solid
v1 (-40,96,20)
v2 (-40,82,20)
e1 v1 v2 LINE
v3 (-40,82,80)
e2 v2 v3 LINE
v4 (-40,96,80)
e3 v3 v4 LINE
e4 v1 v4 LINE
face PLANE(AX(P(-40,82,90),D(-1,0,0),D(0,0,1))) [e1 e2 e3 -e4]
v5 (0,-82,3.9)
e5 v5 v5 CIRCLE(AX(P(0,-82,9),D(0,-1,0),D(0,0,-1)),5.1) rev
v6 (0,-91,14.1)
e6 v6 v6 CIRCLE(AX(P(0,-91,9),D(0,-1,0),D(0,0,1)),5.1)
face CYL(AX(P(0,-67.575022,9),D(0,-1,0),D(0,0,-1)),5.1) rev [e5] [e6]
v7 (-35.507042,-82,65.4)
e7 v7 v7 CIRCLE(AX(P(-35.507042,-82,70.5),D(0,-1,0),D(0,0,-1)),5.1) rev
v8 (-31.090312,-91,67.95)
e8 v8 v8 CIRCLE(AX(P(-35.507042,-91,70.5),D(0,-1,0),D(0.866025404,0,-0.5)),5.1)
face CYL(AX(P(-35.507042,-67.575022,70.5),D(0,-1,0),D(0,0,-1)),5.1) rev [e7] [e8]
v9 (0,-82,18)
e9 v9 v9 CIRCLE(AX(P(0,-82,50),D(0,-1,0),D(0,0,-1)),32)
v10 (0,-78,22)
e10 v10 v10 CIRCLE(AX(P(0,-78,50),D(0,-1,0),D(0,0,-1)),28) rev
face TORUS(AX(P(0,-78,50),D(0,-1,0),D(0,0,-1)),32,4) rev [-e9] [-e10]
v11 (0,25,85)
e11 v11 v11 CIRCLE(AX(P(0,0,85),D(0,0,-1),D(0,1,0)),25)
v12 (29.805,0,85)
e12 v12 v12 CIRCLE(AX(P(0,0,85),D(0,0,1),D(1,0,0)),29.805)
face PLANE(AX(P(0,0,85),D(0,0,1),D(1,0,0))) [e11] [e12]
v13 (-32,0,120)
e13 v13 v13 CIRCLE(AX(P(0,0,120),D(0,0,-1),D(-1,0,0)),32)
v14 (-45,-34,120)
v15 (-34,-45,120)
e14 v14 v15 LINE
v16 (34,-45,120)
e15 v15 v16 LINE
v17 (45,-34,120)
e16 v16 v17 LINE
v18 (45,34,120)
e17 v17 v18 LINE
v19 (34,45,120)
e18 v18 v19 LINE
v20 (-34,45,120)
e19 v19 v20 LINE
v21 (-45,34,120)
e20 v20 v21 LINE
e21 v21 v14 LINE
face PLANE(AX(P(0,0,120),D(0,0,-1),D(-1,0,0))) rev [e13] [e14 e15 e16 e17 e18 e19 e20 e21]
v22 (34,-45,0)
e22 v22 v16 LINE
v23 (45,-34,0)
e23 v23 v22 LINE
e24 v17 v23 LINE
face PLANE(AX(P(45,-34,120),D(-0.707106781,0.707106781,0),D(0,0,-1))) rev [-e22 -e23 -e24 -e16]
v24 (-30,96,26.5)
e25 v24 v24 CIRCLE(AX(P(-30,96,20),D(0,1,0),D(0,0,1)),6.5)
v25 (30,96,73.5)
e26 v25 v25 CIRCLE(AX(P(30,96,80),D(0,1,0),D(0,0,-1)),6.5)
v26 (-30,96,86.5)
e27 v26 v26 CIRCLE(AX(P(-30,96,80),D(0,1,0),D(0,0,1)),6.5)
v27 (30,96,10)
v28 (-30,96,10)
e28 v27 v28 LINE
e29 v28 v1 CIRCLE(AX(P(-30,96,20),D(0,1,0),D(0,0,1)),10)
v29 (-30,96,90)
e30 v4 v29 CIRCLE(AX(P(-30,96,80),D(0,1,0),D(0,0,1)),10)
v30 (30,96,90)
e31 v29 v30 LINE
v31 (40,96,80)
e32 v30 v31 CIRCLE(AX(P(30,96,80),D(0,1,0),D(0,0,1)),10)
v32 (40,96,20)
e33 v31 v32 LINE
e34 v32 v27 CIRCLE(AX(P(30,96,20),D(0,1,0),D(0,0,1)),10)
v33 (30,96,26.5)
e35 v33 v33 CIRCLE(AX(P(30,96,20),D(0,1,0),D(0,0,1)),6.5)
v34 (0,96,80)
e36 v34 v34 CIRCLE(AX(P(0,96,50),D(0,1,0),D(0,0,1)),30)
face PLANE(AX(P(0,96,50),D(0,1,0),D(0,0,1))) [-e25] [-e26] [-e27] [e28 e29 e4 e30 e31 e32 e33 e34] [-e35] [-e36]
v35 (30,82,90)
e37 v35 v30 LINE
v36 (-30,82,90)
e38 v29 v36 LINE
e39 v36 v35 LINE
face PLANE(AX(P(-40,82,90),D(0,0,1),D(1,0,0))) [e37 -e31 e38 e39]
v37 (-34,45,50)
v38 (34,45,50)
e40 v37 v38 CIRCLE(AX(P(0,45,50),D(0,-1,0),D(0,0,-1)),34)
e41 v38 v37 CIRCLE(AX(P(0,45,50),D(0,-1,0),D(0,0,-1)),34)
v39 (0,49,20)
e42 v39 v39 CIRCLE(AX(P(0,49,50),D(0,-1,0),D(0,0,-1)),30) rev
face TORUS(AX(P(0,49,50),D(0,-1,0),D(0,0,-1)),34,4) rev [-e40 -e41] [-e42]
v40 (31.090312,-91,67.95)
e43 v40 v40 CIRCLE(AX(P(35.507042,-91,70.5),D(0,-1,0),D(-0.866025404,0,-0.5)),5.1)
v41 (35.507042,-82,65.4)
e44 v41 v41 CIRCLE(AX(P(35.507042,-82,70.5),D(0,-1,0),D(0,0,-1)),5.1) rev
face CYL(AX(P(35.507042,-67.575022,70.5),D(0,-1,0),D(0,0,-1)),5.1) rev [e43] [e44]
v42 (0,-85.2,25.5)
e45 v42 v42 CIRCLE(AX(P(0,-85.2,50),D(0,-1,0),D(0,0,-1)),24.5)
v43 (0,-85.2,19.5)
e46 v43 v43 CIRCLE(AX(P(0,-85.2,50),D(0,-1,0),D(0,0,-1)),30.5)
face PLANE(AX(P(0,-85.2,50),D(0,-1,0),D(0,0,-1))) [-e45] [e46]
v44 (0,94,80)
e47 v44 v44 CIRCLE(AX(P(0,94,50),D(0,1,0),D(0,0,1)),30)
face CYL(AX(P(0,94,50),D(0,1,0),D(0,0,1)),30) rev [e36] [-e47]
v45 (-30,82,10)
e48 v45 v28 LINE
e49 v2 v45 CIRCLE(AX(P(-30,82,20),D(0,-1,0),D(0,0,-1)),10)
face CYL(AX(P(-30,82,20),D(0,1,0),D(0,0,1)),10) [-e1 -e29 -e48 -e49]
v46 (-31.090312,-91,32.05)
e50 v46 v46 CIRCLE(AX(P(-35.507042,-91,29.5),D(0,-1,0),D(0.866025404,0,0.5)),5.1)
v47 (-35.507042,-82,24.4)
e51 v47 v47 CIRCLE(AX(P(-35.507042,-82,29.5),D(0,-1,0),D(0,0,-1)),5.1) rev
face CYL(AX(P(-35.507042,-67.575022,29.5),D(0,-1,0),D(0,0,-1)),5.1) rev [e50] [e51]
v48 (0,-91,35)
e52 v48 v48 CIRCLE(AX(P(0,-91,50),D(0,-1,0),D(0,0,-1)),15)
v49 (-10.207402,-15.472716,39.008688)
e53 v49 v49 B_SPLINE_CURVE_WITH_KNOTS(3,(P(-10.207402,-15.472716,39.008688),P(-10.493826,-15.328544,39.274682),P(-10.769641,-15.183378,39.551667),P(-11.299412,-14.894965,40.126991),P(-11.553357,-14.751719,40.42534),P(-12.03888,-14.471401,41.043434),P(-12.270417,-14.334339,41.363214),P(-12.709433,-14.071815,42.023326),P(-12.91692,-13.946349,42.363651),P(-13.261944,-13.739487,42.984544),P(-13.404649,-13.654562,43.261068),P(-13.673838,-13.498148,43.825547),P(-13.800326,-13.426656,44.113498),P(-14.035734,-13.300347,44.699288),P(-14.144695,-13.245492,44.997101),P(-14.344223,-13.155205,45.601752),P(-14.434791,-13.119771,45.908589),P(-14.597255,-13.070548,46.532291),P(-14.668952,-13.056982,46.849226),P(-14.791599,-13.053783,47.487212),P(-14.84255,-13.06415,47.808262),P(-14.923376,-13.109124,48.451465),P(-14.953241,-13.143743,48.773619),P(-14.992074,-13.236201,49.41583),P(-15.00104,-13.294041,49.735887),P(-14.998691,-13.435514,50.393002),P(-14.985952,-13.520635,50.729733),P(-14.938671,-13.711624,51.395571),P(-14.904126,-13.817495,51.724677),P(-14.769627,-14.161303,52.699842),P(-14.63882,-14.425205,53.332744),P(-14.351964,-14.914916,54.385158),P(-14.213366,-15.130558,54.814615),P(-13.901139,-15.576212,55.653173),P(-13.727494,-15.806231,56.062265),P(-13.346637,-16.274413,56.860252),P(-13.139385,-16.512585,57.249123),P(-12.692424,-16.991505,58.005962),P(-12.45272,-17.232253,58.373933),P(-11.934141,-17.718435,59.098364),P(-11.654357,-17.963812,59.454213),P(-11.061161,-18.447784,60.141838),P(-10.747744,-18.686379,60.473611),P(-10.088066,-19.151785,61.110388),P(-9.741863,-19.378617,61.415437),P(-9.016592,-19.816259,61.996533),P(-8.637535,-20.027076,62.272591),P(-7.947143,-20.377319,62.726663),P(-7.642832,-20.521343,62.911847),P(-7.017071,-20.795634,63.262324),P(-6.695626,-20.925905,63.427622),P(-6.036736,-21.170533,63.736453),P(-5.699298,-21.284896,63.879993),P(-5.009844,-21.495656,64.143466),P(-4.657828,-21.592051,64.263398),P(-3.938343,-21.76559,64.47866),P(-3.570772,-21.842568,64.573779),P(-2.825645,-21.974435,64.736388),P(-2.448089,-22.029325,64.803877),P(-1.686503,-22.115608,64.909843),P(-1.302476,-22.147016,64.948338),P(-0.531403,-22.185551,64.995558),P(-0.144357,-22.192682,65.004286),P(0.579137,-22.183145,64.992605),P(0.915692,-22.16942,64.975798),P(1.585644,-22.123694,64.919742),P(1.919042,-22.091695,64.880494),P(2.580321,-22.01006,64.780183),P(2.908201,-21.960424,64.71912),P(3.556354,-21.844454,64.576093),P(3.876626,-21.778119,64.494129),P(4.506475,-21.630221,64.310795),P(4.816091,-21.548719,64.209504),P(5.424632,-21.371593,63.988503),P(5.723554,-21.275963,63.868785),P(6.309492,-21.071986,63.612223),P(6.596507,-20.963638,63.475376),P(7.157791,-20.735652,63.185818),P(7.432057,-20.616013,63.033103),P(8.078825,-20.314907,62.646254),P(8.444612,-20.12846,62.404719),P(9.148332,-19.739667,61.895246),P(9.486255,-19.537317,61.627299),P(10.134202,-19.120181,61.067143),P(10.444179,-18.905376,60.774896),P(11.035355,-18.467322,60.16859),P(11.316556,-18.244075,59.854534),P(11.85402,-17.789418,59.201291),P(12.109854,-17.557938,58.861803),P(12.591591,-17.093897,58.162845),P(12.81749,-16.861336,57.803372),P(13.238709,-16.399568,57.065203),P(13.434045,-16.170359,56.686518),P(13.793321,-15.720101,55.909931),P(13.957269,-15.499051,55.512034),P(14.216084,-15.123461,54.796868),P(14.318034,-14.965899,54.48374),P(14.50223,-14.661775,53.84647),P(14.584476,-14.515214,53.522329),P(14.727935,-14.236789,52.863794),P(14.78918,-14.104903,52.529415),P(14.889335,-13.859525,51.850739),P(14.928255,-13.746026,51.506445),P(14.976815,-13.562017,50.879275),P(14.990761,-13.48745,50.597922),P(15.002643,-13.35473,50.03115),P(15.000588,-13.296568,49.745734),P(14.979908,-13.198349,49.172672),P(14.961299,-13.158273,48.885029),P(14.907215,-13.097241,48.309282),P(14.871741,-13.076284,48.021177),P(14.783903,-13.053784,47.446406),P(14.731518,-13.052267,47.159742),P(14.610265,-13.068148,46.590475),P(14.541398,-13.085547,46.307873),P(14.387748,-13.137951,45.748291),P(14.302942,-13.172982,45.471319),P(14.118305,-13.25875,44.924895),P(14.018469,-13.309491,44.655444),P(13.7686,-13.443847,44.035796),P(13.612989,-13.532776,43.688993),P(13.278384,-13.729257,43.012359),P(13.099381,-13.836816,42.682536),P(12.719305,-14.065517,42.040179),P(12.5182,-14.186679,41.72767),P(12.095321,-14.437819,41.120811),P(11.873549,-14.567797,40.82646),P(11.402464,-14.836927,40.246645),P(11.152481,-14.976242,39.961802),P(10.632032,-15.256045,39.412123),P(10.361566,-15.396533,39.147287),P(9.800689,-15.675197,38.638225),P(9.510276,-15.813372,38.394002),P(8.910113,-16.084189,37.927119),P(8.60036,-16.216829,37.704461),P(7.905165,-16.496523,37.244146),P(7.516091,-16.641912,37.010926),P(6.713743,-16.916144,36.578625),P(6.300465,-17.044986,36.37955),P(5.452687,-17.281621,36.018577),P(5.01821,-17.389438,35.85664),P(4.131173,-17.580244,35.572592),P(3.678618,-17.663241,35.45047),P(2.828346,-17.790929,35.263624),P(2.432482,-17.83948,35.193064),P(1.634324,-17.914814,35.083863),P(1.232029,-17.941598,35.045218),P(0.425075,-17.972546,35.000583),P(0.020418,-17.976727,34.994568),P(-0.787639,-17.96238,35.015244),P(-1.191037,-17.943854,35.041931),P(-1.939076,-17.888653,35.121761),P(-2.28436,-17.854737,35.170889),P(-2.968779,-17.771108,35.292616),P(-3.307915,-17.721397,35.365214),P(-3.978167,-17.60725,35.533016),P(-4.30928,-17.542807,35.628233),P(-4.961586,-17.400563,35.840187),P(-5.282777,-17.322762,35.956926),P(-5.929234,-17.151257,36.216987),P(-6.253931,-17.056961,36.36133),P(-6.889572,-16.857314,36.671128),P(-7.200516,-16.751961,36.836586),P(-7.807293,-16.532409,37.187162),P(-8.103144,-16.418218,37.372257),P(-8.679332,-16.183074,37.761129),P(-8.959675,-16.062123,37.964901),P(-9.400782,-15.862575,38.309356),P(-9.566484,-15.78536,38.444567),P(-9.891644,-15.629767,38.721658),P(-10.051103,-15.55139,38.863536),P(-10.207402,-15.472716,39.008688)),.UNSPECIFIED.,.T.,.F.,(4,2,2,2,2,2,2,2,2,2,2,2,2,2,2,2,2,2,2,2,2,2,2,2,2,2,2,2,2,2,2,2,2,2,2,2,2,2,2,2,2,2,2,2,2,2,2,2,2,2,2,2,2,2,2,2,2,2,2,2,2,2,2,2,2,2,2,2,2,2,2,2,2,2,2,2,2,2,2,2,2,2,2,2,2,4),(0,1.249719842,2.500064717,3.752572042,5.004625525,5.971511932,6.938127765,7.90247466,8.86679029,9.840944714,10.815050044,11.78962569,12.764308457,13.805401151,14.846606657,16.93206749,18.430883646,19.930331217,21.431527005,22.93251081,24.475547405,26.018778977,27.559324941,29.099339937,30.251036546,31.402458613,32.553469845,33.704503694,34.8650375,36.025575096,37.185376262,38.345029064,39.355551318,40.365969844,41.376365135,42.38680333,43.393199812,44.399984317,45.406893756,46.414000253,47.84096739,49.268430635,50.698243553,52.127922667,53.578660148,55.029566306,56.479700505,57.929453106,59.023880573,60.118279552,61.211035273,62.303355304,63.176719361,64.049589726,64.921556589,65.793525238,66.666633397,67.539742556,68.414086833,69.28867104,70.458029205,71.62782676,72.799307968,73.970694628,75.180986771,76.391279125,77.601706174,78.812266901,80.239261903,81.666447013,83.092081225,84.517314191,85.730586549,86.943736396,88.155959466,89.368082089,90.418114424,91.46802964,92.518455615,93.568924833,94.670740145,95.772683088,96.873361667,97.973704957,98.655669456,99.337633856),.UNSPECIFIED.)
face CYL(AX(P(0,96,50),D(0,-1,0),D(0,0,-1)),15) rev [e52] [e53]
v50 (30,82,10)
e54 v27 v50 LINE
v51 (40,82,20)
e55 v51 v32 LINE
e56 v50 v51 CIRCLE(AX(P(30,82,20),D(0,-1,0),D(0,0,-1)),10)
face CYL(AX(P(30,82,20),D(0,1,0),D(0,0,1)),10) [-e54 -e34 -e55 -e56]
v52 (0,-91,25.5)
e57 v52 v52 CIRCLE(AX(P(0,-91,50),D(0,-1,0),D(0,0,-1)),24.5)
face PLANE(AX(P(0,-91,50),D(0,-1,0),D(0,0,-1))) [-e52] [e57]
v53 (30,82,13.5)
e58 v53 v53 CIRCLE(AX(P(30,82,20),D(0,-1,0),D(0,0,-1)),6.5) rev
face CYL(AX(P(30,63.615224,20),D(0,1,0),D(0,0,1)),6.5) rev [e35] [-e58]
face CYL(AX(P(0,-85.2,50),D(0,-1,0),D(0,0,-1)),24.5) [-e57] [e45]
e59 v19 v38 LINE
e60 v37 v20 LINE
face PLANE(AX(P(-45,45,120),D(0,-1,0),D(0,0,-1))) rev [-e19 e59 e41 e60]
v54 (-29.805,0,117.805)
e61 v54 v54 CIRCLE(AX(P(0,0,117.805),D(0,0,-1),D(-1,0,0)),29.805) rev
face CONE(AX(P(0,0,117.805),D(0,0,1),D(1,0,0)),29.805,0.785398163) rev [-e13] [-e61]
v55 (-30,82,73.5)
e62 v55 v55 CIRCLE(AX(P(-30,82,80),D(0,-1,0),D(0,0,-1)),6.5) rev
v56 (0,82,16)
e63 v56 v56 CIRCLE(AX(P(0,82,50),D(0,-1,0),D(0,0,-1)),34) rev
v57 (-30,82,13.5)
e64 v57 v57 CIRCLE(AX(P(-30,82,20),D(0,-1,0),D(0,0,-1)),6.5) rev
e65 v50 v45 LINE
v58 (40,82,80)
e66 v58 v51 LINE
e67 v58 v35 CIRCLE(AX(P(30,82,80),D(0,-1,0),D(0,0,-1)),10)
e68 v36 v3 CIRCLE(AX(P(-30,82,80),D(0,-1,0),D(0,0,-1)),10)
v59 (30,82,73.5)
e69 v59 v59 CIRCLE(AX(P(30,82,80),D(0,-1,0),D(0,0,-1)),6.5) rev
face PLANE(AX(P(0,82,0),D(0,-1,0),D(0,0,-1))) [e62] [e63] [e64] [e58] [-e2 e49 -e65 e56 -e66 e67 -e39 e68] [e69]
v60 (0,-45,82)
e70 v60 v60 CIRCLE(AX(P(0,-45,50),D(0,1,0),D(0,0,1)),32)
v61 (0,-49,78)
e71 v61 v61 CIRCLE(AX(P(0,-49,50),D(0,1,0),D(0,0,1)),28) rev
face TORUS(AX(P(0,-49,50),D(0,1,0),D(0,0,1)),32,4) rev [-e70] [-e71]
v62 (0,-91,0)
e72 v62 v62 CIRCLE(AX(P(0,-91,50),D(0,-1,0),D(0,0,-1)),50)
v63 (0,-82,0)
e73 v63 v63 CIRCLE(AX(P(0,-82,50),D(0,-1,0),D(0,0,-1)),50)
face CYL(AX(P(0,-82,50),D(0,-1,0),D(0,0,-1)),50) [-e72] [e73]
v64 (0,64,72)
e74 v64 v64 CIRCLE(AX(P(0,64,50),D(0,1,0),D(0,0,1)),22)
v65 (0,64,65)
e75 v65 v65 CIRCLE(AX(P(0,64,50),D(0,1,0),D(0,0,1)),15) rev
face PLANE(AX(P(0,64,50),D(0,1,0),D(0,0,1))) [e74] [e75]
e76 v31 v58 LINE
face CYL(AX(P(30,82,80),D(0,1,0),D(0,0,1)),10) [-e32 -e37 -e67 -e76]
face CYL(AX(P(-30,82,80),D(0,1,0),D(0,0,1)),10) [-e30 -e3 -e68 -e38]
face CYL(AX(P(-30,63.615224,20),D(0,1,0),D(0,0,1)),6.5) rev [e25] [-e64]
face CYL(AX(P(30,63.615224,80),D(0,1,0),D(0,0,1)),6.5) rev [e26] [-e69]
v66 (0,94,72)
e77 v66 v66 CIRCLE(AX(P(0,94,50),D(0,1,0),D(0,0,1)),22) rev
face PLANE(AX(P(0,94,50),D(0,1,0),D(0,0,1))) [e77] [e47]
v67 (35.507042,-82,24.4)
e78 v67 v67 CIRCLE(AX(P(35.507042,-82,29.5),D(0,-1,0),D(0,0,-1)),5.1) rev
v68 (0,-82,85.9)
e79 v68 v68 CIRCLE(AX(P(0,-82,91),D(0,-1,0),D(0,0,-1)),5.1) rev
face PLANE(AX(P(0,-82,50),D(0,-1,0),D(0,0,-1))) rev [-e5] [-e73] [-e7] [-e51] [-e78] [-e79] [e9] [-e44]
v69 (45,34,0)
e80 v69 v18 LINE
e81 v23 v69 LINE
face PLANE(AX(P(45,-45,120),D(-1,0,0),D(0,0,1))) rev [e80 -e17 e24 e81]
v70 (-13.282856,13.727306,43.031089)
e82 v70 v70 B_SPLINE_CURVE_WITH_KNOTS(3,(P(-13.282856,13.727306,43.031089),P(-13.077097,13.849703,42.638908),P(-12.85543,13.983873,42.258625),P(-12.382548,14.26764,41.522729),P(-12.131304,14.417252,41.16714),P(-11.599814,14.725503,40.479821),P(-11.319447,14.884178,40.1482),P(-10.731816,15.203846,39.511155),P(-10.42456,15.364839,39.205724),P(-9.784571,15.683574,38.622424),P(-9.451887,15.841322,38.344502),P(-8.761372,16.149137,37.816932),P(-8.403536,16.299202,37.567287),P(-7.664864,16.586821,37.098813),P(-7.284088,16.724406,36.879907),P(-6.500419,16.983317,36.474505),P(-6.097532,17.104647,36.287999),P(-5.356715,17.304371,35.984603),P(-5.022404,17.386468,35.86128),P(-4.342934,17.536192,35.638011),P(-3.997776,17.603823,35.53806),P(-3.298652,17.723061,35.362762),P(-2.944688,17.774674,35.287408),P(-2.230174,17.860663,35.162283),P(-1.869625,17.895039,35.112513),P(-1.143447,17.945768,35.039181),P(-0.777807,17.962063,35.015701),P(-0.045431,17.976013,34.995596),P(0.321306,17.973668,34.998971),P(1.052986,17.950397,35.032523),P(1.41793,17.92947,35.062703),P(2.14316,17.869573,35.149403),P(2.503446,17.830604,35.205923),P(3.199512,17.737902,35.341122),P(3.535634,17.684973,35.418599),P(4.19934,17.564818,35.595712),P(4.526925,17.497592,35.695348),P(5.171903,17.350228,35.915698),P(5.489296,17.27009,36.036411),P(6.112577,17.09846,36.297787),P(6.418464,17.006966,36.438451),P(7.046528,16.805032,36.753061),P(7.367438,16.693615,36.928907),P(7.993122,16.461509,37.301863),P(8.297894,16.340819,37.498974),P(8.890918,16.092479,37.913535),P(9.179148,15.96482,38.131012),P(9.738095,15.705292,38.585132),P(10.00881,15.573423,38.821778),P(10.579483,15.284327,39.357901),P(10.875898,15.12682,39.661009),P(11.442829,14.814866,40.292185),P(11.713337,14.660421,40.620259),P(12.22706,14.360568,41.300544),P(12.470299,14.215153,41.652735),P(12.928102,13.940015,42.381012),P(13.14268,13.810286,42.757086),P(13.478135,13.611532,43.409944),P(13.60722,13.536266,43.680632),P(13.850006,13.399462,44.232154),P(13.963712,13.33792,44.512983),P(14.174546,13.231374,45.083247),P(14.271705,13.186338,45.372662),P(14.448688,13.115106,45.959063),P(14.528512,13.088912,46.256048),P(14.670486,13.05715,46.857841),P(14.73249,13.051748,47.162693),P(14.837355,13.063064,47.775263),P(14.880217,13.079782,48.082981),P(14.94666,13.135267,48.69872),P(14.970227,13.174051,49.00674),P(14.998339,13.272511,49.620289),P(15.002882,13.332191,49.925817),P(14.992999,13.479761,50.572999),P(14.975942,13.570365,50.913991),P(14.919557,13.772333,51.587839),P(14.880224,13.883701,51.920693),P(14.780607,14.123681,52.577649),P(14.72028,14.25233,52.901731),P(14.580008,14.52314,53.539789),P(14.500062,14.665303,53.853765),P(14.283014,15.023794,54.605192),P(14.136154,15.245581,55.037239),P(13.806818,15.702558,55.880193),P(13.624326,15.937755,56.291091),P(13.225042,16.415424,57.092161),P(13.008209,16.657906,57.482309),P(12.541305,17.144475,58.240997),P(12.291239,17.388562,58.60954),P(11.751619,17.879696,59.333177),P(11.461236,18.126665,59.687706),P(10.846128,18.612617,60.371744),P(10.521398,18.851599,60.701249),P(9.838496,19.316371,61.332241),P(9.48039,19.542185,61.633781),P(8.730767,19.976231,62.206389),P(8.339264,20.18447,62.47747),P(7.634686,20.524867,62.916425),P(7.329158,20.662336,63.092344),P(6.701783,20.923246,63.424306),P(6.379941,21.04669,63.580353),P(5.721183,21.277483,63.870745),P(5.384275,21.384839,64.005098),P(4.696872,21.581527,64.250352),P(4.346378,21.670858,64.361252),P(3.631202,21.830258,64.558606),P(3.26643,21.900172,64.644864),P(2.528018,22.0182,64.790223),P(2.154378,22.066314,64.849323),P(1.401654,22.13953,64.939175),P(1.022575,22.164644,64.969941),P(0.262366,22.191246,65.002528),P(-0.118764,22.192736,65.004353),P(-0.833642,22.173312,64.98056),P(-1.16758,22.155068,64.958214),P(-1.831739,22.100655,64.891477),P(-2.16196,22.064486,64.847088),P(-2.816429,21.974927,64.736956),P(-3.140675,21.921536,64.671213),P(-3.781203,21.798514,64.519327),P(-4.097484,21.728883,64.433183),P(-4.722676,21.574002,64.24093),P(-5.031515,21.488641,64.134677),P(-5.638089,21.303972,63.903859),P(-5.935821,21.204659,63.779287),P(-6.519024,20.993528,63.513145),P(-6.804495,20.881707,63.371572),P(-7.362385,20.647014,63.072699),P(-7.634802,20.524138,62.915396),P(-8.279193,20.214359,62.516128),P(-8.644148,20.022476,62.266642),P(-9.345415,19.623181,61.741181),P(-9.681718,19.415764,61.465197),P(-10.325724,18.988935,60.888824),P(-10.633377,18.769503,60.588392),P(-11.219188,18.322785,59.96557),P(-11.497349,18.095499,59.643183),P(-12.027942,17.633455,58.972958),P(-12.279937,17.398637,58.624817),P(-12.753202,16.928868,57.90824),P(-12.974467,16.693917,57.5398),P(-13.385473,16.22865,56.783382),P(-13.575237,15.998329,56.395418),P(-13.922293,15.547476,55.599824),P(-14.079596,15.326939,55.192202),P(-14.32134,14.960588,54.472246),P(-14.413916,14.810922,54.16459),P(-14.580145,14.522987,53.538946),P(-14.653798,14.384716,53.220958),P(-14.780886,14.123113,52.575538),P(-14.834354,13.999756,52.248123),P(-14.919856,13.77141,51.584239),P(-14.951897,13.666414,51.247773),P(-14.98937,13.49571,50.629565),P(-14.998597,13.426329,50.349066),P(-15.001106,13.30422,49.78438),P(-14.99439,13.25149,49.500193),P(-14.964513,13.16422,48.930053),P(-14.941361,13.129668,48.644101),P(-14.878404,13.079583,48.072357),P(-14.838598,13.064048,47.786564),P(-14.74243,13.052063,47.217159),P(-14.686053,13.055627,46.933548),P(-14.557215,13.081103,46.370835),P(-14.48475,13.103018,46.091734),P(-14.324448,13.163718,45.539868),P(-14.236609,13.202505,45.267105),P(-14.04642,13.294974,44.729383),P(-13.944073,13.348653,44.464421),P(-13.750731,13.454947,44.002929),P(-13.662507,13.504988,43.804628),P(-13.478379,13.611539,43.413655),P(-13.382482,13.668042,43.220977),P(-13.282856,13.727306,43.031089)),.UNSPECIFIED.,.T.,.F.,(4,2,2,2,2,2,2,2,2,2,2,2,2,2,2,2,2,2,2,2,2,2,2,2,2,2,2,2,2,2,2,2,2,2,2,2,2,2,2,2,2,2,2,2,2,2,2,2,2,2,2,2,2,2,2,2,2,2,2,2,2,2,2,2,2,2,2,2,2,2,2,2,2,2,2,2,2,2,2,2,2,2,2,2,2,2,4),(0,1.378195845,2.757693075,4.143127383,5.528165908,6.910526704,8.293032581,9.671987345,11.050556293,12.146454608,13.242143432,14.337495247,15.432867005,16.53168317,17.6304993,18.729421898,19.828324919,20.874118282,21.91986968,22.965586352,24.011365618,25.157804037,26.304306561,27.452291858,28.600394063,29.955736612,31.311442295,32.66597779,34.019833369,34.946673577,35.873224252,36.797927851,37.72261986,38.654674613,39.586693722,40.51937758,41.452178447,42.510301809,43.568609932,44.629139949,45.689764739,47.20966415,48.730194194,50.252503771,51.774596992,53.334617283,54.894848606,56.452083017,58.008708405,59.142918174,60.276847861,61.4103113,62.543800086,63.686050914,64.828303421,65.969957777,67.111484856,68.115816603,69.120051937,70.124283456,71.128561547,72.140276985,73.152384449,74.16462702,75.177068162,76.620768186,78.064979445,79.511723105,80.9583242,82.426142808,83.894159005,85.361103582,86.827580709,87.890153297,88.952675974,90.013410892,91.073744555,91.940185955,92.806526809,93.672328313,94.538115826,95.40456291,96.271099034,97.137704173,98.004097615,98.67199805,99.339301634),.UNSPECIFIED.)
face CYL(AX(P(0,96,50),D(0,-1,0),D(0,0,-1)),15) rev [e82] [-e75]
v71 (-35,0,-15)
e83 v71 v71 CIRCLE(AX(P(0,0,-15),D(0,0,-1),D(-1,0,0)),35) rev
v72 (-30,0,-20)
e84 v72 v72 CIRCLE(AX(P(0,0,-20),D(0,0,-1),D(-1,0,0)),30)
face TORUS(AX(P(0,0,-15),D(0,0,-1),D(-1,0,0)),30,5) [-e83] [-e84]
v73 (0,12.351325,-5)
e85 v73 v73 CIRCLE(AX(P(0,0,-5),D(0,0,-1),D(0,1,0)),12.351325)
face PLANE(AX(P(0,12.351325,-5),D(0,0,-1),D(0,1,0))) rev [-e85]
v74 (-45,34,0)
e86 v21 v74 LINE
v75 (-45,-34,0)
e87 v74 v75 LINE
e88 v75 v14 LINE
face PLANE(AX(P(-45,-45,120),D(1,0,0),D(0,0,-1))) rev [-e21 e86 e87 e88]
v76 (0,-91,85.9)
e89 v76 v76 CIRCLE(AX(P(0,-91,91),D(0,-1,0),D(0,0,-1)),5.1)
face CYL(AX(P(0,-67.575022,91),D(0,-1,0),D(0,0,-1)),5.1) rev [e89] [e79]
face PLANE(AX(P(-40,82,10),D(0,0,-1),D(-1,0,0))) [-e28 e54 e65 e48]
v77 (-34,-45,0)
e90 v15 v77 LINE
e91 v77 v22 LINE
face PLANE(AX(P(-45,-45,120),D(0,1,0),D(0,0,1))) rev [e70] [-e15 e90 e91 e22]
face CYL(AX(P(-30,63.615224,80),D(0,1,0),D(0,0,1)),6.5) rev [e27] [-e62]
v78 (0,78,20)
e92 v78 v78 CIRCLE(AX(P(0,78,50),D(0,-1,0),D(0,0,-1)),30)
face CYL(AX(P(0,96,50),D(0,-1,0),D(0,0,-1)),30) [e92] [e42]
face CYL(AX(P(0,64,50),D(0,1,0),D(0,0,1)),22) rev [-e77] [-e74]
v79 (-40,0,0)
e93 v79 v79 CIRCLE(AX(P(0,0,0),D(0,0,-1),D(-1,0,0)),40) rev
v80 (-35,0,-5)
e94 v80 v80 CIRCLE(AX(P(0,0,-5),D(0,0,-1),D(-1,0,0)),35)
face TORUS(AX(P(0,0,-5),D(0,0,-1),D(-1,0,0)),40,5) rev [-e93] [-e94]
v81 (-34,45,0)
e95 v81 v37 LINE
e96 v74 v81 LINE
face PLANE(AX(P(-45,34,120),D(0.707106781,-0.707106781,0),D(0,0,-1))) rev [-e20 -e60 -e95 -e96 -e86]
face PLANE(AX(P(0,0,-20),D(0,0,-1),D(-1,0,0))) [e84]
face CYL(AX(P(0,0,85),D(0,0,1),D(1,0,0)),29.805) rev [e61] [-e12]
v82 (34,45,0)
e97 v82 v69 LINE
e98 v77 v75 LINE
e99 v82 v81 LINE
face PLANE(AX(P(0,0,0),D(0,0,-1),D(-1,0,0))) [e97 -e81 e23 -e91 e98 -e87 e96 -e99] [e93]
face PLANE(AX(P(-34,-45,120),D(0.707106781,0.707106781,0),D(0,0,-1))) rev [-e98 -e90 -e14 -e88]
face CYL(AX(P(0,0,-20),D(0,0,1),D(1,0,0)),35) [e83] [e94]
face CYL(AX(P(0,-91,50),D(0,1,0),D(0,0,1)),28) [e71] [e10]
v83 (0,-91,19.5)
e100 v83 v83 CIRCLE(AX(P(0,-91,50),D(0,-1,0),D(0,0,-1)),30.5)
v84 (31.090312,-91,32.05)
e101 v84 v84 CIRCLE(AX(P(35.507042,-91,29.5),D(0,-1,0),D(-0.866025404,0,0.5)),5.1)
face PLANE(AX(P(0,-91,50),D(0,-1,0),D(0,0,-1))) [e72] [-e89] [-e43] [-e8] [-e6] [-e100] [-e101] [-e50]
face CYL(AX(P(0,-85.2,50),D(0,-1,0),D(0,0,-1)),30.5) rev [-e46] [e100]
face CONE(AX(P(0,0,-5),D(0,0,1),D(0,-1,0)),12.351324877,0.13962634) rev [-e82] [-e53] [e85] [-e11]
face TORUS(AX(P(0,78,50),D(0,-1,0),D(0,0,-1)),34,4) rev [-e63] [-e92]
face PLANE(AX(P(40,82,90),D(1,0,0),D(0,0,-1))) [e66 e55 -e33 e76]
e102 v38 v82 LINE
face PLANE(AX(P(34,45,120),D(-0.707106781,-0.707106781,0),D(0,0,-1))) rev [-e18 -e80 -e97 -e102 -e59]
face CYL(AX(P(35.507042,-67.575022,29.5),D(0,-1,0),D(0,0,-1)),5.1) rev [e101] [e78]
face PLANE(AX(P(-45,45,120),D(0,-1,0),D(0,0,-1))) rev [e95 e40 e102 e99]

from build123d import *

# Parameters (mm, degrees)
SKETCH_1_W               = 90
SKETCH_1_H               = 90
EXTRUDE_1_DEPTH          = 120
SKETCH_9_R               = 35
EXTRUDE_6_DEPTH          = 20
SKETCH_2_R               = 30
EXTRUDE_2_DEPTH          = 51
SKETCH_3_W               = 80
SKETCH_3_H               = 80
EXTRUDE_3_DEPTH          = 14
SKETCH_4_R               = 28
EXTRUDE_4_DEPTH          = 46
SKETCH_5_R               = 50
EXTRUDE_5_DEPTH          = 9
SKETCH_6_R               = 15
CUT_EXTRUDE_1_DEPTH      = 228.747667387
SKETCH_7_R               = 22
CUT_EXTRUDE_2_DEPTH      = 32
FILLET_1_R               = 10
SKETCH_10_R              = 6.5
CUT_EXTRUDE_4_DEPTH      = 14
CHAMFER_1_SIZE           = 11
FILLET_2_R               = 5
SKETCH_11_R              = 29.805
CUT_EXTRUDE_5_DEPTH      = 35
CHAMFER_2_SIZE           = 2.195
CUT_EXTRUDE_START        = -2
SKETCH_14_R              = 30
CUT_EXTRUDE_6_DEPTH      = 2
FILLET_3_R               = 4
SKETCH_15_R              = 5.1
CUT_EXTRUDE_7_DEPTH      = 9
SKETCH_16_R              = 30.5
SKETCH_16_R_2            = 24.5
CUT_EXTRUDE_8_DEPTH      = 5.8
PATTERN_CIRCULAR_2_COUNT = 6


with BuildPart() as part:
    # Эскиз1 → Бобышка-Вытянуть1 (new body)
    with BuildSketch(Plane.XY):
        Rectangle(SKETCH_1_W, SKETCH_1_H)
    extrude(amount=EXTRUDE_1_DEPTH)

    # Эскиз9 → Бобышка-Вытянуть6 (add)
    with BuildSketch(Plane(origin=(0, 0, 0), x_dir=(-1, 0, 0), z_dir=(0, 0, -1))):
        Circle(SKETCH_9_R)
    extrude(amount=EXTRUDE_6_DEPTH)

    # Эскиз2 → Бобышка-Вытянуть2 (add)
    with BuildSketch(Plane(origin=(0, 45, 0), x_dir=(1, 0, 0), z_dir=(0, 1, 0))):
        with Locations(Location((0, -50, 0), (0, 0, 90))):
            Circle(SKETCH_2_R)
    extrude(amount=EXTRUDE_2_DEPTH)

    # Эскиз3 → Бобышка-Вытянуть3 (add)
    with BuildSketch(Plane(origin=(0, 96, 0), x_dir=(1, 0, 0), z_dir=(0, 1, 0))):
        with Locations((0, -50)):
            Rectangle(SKETCH_3_W, SKETCH_3_H)
    extrude(amount=-EXTRUDE_3_DEPTH)

    # Эскиз4 → Бобышка-Вытянуть4 (add)
    with BuildSketch(Plane.XZ.offset(45)):
        with Locations(Location((0, 50, 0), (0, 0, 90))):
            Circle(SKETCH_4_R)
    extrude(amount=EXTRUDE_4_DEPTH)

    # Эскиз5 → Бобышка-Вытянуть5 (add)
    with BuildSketch(Plane.XZ.offset(91)):
        with Locations(Location((0, 50, 0), (0, 0, 270))):
            Circle(SKETCH_5_R)
    extrude(amount=-EXTRUDE_5_DEPTH)

    # Эскиз6 → Вырез-Вытянуть1 (cut, through all)
    with BuildSketch(Plane(origin=(0, -91, 0), x_dir=(-1, 0, 0), z_dir=(0, -1, 0))):
        with Locations(Location((0, -50, 0), (0, 0, 90))):
            Circle(SKETCH_6_R)
    extrude(amount=-CUT_EXTRUDE_1_DEPTH, mode=Mode.SUBTRACT)

    # Эскиз7 → Вырез-Вытянуть2 (cut)
    with BuildSketch(Plane(origin=(0, 96, 0), x_dir=(1, 0, 0), z_dir=(0, 1, 0))):
        with Locations(Location((0, -50, 0), (0, 0, 270))):
            Circle(SKETCH_7_R)
    extrude(amount=-CUT_EXTRUDE_2_DEPTH, mode=Mode.SUBTRACT)

    # Скругление1
    fillet_1_edges = [part.edges().sort_by_distance(p)[0] for p in [
        (40, 89, 10),
        (40, 89, 90),
        (-40, 89, 90),
        (-40, 89, 10),
    ]]
    fillet(fillet_1_edges, radius=FILLET_1_R)

    # Эскиз10 → Вырез-Вытянуть4 (cut)
    with BuildSketch(Plane(origin=(0, 96, 0), x_dir=(1, 0, 0), z_dir=(0, 1, 0))):
        with Locations(Location((-30, -20, 0), (0, 0, 270))):
            Circle(SKETCH_10_R)
        with Locations(Location((30, -80, 0), (0, 0, 90))):
            Circle(SKETCH_10_R)
        with Locations(Location((30, -20, 0), (0, 0, 270))):
            Circle(SKETCH_10_R)
        with Locations(Location((-30, -80, 0), (0, 0, 270))):
            Circle(SKETCH_10_R)
    extrude(amount=-CUT_EXTRUDE_4_DEPTH, mode=Mode.SUBTRACT)

    # Фаска1
    chamfer_1_edges = [part.edges().sort_by_distance(p)[0] for p in [
        (45, -45, 60),
        (-45, -45, 60),
        (-45, 45, 60),
        (45, 45, 60),
    ]]
    chamfer(chamfer_1_edges, length=CHAMFER_1_SIZE)

    # Скругление2
    fillet_2_edges = [part.edges().sort_by_distance(p)[0] for p in [
        (35, 0, 0),
        (35, 0, -20),
    ]]
    fillet(fillet_2_edges, radius=FILLET_2_R)

    # Эскиз11 → Вырез-Вытянуть5 (cut)
    with BuildSketch(Plane.XY.offset(120)):
        Circle(SKETCH_11_R)
    extrude(amount=-CUT_EXTRUDE_5_DEPTH, mode=Mode.SUBTRACT)

    # Эскиз13 → Вырез-Повернуть1 (revolve, cut)
    with BuildSketch(Plane(origin=(0, 0, 0), x_dir=(0, 0, -1), z_dir=(1, 0, 0))):
        Polygon((-85, 25), (5, 12.351324877), (5, 0), (-85, 0), align=None)
    revolve(axis=Axis((0, 0, 0), (0, 0, 1)), mode=Mode.SUBTRACT)

    # Фаска2
    chamfer_2_edges = [part.edges().sort_by_distance(p)[0] for p in [
        (-29.805, 0, 120),
    ]]
    chamfer(chamfer_2_edges, length=CHAMFER_2_SIZE)

    # Эскиз14 → Вырез-Вытянуть6 (cut)
    with BuildSketch(Plane(origin=(0, 96, 0), x_dir=(1, 0, 0), z_dir=(0, 1, 0)).offset(CUT_EXTRUDE_START)):
        with Locations(Location((0, -50, 0), (0, 0, 90))):
            Circle(SKETCH_14_R)
    extrude(amount=CUT_EXTRUDE_6_DEPTH, mode=Mode.SUBTRACT)

    # Скругление3
    fillet_3_edges = [part.edges().sort_by_distance(p)[0] for p in [
        (0, 45, 80),
        (0, 82, 80),
        (0, -45, 22),
        (0, -82, 22),
    ]]
    fillet(fillet_3_edges, radius=FILLET_3_R - 0.0001)  # a hair under: the kernel refuses the full size

    # Эскиз15 → Вырез-Вытянуть7 (cut)
    with BuildSketch(Plane.XZ.offset(91)):
        with Locations(Location((0, 91, 0), (0, 0, 270))):
            Circle(SKETCH_15_R)
    cut_extrude_7 = extrude(amount=-CUT_EXTRUDE_7_DEPTH, mode=Mode.SUBTRACT)

    # Эскиз16 → Вырез-Вытянуть8 (cut)
    with BuildSketch(Plane.XZ.offset(91)):
        with Locations(Location((0, 50, 0), (0, 0, 270))):
            Circle(SKETCH_16_R)
        with Locations(Location((0, 50, 0), (0, 0, 270))):
            Circle(SKETCH_16_R_2, mode=Mode.SUBTRACT)
    extrude(amount=-CUT_EXTRUDE_8_DEPTH, mode=Mode.SUBTRACT)

    # Круговой массив2: Вырез-Вытянуть7 ×6 about axis
    pattern_circular_2_axis = Axis((0, 0, 50), (0, 1, 0))
    for i in range(1, PATTERN_CIRCULAR_2_COUNT):
        add(cut_extrude_7.rotate(pattern_circular_2_axis, i * 360 / PATTERN_CIRCULAR_2_COUNT), mode=Mode.SUBTRACT)


solid = part.part
